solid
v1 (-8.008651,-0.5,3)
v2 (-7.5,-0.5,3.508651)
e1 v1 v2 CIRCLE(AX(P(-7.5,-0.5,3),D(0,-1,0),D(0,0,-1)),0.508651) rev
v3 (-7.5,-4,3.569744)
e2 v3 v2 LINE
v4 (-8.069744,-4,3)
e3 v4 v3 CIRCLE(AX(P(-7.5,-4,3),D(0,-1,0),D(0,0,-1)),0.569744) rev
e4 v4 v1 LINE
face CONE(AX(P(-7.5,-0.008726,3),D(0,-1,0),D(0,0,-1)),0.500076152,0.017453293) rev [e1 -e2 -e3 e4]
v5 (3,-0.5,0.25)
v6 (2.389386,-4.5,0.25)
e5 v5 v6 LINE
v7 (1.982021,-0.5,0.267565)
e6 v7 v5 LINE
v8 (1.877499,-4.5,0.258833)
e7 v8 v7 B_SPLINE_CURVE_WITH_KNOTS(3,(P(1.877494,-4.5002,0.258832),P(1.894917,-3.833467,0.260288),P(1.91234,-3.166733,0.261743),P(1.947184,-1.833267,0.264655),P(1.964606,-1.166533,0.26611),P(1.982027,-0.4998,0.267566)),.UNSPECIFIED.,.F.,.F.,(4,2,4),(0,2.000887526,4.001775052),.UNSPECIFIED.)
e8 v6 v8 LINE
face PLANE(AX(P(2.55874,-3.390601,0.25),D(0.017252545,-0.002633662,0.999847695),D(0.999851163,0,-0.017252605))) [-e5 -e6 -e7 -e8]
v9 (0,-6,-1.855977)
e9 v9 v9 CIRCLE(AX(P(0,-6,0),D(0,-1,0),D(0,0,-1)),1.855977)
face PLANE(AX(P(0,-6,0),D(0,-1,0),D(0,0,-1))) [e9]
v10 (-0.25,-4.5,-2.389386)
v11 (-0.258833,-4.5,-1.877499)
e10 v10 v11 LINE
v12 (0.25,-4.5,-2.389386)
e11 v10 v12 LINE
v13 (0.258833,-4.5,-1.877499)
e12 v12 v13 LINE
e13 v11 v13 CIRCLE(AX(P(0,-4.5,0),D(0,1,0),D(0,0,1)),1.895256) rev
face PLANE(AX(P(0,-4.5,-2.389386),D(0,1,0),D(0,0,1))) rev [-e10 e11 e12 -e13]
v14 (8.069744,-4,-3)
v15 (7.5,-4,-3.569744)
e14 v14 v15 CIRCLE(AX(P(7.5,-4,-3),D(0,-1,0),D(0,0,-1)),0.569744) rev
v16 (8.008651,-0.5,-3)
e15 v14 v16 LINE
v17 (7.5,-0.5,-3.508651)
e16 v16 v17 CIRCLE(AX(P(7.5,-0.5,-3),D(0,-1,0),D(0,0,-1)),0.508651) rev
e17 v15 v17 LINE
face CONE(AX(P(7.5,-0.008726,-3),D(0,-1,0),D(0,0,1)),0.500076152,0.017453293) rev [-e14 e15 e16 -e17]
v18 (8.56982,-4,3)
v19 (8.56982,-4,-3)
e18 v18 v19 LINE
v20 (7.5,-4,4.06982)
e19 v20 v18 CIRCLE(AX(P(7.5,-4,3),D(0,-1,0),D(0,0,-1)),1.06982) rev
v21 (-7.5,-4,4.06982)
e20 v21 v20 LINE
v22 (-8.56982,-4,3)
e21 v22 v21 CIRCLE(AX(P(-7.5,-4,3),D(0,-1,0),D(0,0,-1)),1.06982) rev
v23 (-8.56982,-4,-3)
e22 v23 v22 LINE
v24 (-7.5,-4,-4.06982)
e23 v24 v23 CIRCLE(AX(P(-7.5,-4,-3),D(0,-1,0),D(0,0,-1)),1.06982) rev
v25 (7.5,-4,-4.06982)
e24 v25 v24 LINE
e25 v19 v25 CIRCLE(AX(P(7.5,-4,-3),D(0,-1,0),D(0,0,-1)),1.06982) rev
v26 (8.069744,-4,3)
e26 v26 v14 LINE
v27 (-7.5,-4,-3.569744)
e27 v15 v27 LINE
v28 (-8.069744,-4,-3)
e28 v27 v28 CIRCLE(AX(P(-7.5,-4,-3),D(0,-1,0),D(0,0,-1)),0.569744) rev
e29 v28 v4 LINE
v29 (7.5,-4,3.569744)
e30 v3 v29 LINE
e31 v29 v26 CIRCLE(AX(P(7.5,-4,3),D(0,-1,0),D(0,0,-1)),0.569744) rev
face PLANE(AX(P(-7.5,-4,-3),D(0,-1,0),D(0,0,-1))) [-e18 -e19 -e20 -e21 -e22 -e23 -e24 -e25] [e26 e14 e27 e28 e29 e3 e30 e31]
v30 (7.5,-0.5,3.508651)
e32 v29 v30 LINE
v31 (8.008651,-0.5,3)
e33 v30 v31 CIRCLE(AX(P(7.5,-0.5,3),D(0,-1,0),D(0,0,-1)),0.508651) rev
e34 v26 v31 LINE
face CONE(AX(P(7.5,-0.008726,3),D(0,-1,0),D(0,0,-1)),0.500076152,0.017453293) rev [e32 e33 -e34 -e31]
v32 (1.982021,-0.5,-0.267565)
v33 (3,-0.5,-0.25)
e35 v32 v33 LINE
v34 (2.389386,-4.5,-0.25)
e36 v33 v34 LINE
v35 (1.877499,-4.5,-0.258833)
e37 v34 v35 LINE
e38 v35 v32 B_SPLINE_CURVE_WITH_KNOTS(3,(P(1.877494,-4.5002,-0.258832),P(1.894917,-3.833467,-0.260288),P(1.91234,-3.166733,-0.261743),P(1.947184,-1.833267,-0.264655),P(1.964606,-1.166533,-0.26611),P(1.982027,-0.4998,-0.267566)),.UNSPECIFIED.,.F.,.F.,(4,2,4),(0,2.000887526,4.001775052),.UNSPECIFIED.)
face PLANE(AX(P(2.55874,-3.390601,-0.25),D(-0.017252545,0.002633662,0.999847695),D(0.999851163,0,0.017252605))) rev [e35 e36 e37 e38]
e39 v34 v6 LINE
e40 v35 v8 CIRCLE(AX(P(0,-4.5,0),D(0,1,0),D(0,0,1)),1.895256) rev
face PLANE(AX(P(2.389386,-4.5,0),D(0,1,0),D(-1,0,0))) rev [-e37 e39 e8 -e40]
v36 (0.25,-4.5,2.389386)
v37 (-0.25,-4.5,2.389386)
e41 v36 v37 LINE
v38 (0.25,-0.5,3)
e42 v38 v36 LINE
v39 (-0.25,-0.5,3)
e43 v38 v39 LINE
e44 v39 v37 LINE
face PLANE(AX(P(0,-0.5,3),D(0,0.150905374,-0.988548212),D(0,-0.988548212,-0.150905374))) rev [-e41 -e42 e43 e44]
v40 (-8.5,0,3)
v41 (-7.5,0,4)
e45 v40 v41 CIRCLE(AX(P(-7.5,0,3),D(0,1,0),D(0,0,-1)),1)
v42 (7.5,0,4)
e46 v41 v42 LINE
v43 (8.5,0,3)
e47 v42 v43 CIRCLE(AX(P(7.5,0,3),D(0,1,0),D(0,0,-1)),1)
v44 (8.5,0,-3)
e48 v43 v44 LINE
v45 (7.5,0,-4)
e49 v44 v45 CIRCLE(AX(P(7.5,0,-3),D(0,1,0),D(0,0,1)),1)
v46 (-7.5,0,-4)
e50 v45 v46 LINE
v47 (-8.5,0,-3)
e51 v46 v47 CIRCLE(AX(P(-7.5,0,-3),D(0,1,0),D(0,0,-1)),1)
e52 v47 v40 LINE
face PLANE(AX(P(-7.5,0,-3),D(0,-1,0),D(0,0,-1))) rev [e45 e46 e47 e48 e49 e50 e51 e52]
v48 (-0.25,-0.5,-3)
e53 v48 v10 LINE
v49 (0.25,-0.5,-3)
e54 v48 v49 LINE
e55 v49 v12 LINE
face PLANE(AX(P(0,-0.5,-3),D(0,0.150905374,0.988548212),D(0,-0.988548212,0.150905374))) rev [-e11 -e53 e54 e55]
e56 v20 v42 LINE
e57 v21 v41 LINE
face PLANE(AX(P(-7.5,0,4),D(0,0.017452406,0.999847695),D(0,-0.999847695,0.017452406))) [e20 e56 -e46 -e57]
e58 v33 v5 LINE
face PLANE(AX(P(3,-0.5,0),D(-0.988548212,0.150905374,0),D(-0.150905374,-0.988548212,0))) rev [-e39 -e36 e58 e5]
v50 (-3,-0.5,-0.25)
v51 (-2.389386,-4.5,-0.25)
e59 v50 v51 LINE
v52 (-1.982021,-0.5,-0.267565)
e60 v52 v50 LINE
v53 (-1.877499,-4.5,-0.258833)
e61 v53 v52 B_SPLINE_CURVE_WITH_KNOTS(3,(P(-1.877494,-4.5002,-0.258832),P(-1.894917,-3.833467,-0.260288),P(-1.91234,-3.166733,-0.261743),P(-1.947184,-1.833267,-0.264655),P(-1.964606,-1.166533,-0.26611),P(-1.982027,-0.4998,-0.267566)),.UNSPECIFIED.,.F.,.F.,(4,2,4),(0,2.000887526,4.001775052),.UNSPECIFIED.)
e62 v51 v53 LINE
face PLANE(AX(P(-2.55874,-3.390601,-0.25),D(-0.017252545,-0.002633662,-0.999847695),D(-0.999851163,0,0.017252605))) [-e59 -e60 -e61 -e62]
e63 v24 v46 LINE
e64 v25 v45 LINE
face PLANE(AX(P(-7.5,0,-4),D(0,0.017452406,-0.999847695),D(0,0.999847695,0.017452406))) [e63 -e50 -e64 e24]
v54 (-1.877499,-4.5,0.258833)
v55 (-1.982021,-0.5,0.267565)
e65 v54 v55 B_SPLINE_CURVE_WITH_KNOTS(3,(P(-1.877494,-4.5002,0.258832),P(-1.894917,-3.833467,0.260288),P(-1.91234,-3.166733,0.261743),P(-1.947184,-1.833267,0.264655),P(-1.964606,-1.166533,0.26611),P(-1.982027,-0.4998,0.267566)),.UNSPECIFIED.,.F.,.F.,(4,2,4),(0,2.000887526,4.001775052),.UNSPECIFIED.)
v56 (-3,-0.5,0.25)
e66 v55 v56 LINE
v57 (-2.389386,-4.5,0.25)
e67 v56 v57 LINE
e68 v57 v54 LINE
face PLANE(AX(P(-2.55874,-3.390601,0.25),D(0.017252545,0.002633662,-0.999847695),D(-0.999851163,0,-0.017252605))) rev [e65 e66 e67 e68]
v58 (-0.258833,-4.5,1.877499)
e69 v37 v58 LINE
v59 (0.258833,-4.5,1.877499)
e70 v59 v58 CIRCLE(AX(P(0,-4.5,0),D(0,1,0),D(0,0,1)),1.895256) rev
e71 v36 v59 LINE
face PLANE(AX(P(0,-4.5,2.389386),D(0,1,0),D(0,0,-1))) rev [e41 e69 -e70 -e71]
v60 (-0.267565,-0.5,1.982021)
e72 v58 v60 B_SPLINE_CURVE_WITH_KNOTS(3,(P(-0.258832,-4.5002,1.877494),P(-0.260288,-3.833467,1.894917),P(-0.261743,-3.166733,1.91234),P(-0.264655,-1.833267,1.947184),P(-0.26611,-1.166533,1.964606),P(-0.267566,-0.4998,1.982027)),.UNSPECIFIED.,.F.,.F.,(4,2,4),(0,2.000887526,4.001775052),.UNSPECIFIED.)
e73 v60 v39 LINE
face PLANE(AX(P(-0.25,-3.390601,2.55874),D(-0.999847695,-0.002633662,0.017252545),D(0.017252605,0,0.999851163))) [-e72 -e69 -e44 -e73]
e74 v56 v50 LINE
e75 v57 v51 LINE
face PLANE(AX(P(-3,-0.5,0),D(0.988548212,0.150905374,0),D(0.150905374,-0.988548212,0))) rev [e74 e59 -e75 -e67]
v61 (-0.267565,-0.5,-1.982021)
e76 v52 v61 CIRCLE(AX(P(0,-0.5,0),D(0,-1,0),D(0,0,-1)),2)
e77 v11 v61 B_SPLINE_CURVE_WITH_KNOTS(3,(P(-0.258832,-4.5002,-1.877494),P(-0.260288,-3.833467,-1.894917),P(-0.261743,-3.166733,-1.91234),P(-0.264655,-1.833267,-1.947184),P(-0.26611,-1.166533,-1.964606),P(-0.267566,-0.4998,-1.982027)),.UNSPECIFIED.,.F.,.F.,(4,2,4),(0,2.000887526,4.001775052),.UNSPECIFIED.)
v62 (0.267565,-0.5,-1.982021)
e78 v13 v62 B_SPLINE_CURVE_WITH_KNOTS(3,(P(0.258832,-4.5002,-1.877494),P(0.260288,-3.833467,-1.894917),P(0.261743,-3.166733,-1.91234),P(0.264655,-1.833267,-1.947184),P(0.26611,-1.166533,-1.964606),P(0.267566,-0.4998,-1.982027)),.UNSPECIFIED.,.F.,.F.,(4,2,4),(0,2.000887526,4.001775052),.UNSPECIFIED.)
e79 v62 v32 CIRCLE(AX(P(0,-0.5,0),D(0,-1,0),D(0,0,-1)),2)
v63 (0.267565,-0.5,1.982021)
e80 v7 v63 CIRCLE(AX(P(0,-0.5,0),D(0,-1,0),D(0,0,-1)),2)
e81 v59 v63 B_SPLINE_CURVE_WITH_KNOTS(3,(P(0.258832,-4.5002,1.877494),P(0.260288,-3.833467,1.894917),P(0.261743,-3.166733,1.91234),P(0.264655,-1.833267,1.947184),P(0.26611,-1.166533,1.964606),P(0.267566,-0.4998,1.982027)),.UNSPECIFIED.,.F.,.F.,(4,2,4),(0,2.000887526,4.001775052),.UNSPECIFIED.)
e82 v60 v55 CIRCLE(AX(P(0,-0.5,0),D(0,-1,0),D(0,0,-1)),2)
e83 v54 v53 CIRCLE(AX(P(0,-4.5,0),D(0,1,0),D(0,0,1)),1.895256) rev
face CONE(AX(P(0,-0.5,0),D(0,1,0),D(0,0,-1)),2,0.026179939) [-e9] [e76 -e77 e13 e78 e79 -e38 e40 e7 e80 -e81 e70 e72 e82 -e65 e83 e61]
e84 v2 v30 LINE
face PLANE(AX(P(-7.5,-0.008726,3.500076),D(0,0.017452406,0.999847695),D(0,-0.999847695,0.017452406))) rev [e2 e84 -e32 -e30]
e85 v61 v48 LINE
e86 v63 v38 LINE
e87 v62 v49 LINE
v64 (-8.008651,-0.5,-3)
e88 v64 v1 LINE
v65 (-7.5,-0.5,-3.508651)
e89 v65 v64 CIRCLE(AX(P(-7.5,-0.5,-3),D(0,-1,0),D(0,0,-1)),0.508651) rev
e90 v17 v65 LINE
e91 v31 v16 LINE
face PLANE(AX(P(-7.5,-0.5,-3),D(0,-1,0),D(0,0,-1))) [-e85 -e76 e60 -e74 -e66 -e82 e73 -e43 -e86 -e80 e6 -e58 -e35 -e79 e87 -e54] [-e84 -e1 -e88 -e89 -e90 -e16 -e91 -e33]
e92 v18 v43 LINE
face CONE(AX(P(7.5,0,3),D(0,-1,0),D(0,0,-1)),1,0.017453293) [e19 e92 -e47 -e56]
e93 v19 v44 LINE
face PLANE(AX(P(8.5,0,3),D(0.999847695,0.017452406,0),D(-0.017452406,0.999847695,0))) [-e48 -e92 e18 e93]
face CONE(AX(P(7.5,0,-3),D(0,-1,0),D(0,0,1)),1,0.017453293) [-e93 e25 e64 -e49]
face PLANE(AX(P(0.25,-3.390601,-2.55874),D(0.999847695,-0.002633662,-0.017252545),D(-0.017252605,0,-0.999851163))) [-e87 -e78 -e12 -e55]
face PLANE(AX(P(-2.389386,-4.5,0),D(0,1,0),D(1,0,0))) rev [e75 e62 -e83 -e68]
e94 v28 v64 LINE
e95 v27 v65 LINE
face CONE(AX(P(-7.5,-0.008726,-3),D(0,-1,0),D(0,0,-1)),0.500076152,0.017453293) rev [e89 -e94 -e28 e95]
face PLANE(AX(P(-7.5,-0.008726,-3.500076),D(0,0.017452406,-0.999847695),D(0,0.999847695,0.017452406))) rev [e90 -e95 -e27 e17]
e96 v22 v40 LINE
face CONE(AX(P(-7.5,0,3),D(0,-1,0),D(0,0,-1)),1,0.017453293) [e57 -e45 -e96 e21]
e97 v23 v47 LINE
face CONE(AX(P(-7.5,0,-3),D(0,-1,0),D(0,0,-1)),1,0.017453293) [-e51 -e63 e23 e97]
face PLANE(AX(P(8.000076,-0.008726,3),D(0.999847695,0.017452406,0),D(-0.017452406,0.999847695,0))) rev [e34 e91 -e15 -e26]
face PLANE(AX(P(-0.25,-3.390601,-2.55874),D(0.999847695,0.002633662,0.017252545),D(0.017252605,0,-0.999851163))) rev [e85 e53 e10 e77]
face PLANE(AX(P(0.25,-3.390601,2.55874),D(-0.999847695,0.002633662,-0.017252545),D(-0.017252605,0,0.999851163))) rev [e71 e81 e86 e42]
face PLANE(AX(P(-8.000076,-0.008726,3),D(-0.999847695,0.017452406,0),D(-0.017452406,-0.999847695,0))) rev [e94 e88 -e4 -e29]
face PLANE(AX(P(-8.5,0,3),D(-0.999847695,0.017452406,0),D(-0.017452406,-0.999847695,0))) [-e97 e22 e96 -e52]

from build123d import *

# Parameters (mm, degrees)
BOSS_EXTRUDE1_DEPTH = 4
BOSS_EXTRUDE1_DRAFT = 1
SHELL1_T            = -0.5
SKETCH2_R           = 2
BOSS_EXTRUDE2_DEPTH = 5.5
BOSS_EXTRUDE2_TAPER = 1.5
CIRPATTERN1_COUNT   = 4


with BuildPart() as part:
    # Sketch1 → Boss-Extrude1 (with draft: the straight prism first)
    with BuildSketch(Plane(origin=(0, 0, 0), x_dir=(1, 0, 0), z_dir=(0, 1, 0))):
        with BuildLine():
            Line((-7.5, -4), (7.5, -4))
            ThreePointArc((7.5, -4), (8.207106781, -3.707106781), (8.5, -3))
            Line((8.5, -3), (8.5, 3))
            ThreePointArc((8.5, 3), (8.207106781, 3.707106781), (7.5, 4))
            Line((7.5, 4), (-7.5, 4))
            ThreePointArc((-7.5, 4), (-8.207106781, 3.707106781), (-8.5, 3))
            Line((-8.5, 3), (-8.5, -3))
            ThreePointArc((-8.5, -3), (-8.207106781, -3.707106781), (-7.5, -4))
        make_face()
    extrude(amount=-BOSS_EXTRUDE1_DEPTH)
    # Boss-Extrude1: the draft: its side faces are tilted about the plane it starts from
    boss_extrude1_sides = [part.faces().sort_by_distance(p)[0] for p in [
        (0, -2, 4),
        (8.207106781, -2, 3.707106781),
        (8.5, -2, 0),
        (8.207106781, -2, -3.707106781),
        (0, -2, -4),
        (-8.207106781, -2, -3.707106781),
        (-8.5, -2, 0),
        (-8.207106781, -2, 3.707106781),
    ]]
    draft(boss_extrude1_sides, Plane(origin=(0, 0, 0), x_dir=(1, 0, 0), z_dir=(0, 1, 0)), BOSS_EXTRUDE1_DRAFT)

    # Shell1
    shell1_openings = [part.faces().sort_by_distance(p)[0] for p in [
        (0, -4, 0),
    ]]
    offset(amount=SHELL1_T, openings=shell1_openings, kind=Kind.INTERSECTION)

    # Sketch2 → Boss-Extrude2 (add)
    with BuildSketch(Plane.XZ.offset(0.5)):
        Circle(SKETCH2_R)
    extrude(amount=BOSS_EXTRUDE2_DEPTH, taper=BOSS_EXTRUDE2_TAPER)

    # Rib1: read off the stored shape, not the designer's step
    # Rib1: loft between two sections, ruled curve by curve
    rib1_from = [
        Edge.make_line((1.982021382, -0.5, 0.267565397), (3, -0.5, 0.25)),
        Edge.make_line((1.982021382, -0.5, -0.267565397), (3, -0.5, -0.25)),
        Edge.make_line((3, -0.5, -0.25), (3, -0.5, 0.25)),
        Edge.make_line((1.982021382, -0.5, -0.267565397), (1.982021382, -0.5, 0.267565397)),
    ]
    rib1_to = [
        Edge.make_line((1.877498903, -4.5, 0.258832698), (2.38938588, -4.5, 0.25)),
        Edge.make_line((1.877498903, -4.5, -0.258832698), (2.38938588, -4.5, -0.25)),
        Edge.make_line((2.38938588, -4.5, -0.25), (2.38938588, -4.5, 0.25)),
        Edge.make_line((1.877498903, -4.5, -0.258832698), (1.877498903, -4.5, 0.258832698)),
    ]
    rib1 = Solid(Shell([*[Face.make_surface_from_curves(rib1_from[k], rib1_to[k]) for k in range(4)], Face(Wire(rib1_from)), Face(Wire(rib1_to))]))
    add(rib1)

    # CirPattern1: Rib1 ×4 about axis
    cirpattern1_axis = Axis((0, 0, 0), (0, 1, 0))
    for i in range(1, CIRPATTERN1_COUNT):
        add(rib1.rotate(cirpattern1_axis, i * 360 / CIRPATTERN1_COUNT))


solid = part.part
